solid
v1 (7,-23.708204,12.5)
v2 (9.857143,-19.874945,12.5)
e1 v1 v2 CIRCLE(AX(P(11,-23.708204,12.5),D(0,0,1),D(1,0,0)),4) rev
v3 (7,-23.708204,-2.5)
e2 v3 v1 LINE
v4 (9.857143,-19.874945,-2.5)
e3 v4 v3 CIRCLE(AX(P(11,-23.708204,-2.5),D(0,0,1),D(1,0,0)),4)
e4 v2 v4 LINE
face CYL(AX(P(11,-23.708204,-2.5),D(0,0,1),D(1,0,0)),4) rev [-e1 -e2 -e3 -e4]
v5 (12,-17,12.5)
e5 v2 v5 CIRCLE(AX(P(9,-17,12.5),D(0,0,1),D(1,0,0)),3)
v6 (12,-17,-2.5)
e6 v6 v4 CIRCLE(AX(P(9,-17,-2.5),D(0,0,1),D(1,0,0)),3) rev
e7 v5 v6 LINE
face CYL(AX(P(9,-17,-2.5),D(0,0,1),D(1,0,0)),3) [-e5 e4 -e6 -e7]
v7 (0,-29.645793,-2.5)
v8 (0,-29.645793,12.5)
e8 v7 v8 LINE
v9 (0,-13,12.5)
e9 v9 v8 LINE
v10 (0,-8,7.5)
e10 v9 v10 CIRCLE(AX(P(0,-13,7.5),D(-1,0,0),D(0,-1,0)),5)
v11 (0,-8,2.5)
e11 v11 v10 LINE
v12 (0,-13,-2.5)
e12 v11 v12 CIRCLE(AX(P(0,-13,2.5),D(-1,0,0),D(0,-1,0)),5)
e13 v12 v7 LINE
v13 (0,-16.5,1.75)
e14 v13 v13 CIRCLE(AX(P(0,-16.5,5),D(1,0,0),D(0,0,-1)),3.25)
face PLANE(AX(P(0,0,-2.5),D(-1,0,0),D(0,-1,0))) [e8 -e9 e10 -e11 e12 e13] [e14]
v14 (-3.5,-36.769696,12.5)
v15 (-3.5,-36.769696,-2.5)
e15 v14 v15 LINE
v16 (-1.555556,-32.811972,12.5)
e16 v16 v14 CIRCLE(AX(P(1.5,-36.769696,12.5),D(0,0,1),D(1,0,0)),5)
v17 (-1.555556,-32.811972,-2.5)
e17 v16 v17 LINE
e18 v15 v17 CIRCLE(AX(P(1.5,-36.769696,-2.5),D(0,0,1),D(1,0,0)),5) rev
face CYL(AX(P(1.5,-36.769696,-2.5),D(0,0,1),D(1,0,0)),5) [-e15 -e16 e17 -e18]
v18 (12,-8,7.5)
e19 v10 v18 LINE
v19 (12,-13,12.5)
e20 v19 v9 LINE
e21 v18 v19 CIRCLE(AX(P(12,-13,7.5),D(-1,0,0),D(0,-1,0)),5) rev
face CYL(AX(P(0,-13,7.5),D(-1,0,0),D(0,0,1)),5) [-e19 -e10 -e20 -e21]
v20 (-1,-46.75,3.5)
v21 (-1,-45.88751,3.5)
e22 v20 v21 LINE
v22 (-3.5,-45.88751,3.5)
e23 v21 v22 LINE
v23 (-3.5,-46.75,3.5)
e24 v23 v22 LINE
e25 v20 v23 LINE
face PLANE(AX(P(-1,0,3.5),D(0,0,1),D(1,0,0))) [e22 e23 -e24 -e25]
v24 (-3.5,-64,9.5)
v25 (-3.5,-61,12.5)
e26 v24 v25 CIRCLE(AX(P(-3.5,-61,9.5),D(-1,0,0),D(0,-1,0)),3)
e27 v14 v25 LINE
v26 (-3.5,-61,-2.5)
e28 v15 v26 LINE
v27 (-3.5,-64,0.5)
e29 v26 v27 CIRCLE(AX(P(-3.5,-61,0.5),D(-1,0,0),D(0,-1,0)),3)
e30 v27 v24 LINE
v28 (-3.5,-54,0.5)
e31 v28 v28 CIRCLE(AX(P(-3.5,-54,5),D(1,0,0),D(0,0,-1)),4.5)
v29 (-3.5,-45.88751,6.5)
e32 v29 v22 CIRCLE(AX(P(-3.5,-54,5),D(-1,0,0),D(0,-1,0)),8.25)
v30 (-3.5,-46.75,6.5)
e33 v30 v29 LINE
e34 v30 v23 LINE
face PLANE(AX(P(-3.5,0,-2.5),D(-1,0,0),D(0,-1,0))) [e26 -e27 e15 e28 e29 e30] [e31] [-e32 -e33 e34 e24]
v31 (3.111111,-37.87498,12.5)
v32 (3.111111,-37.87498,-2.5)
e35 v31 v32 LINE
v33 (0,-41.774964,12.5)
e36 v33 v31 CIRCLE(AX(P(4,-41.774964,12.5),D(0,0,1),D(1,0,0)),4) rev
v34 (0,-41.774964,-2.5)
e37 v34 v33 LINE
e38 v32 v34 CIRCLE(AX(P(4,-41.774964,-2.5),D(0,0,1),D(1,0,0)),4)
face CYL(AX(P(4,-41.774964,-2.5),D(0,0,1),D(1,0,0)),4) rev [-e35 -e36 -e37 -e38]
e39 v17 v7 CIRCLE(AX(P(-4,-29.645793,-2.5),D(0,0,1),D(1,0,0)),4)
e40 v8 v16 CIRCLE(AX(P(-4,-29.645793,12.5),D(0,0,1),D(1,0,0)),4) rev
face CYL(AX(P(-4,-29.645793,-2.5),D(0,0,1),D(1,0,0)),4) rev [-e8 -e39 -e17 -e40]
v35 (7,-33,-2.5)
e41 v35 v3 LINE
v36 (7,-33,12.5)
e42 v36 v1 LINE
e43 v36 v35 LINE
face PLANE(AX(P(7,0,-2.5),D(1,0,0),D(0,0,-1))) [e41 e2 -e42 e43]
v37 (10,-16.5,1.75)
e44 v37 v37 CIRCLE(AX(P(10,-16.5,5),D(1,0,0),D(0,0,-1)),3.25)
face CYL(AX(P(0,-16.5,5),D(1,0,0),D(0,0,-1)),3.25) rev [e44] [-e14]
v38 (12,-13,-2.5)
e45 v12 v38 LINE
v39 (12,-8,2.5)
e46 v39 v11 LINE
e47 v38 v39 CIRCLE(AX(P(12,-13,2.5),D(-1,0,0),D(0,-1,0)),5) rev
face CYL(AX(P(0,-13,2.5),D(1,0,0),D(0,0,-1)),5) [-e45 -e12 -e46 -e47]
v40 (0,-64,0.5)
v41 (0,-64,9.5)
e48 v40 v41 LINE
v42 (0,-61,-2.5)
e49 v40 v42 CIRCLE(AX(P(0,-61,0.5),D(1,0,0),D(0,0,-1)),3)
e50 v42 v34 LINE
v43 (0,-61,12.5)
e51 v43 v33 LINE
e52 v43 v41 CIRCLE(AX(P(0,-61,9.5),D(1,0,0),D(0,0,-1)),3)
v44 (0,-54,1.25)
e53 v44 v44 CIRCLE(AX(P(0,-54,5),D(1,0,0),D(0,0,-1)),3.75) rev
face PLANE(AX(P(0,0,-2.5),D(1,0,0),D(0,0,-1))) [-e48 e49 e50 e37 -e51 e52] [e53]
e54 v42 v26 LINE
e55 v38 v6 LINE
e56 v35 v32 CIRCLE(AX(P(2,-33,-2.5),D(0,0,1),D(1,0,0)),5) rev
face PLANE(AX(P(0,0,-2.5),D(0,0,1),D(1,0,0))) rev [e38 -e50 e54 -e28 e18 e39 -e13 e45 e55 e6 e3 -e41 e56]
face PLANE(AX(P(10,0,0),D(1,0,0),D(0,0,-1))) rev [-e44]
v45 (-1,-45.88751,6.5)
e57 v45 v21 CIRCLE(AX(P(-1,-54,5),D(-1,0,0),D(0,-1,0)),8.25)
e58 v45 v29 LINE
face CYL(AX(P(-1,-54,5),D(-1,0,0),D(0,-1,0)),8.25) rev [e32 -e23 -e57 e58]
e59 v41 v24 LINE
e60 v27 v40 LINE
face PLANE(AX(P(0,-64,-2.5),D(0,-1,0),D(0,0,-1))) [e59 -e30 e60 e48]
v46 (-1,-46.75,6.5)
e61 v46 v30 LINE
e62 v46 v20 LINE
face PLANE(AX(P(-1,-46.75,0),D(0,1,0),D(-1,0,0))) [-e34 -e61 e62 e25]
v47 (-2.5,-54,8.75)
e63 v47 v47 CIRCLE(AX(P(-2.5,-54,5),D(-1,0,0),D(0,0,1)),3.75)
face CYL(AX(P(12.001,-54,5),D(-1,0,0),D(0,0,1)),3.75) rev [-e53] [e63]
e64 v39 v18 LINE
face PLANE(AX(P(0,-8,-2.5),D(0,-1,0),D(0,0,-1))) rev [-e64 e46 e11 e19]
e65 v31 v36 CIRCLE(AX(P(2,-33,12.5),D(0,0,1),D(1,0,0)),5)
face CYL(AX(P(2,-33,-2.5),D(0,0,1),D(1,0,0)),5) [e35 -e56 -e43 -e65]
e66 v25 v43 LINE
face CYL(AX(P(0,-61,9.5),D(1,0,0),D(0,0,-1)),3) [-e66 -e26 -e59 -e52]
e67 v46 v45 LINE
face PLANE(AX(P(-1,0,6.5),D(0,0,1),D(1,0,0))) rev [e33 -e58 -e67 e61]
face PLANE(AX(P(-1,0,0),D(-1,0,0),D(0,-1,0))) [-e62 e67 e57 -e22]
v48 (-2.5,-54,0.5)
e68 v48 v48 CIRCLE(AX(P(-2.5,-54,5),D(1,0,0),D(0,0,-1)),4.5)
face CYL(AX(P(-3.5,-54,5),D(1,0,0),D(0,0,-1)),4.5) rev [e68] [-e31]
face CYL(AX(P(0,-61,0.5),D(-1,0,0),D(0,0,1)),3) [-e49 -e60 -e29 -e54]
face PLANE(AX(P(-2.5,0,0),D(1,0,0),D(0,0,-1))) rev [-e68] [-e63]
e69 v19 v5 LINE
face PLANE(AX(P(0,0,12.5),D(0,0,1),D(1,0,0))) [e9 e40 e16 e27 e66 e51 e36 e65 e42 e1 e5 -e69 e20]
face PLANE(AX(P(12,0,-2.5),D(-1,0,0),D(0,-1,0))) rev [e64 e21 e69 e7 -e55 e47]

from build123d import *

# Parameters (mm, degrees)
BOSS_EXTRUDE1_DEPTH      = 12.5
BOSS_EXTRUDE1_DEPTH_BACK = 2.5
F_3DSKETCH2_R            = 4.5
CUT_EXTRUDE2_DEPTH       = 1
CUT_EXTRUDE3_REACH       = 68.802
SKETCH3_R                = 3.75
CUT_EXTRUDE6_OUTLINE_R   = 3.25
CUT_EXTRUDE6_DEPTH       = 10
CUT_EXTRUDE7_DEPTH       = 2.5
FILLET1_R                = 5
FILLET2_R                = 4
FILLET3_R                = 4
FILLET4_R                = 3
FILLET5_R                = 3
FILLET6_R                = 4


# Read off the part's stored shape, not the designer's step: Cut-Extrude6
with BuildPart() as part:
    # Sketch1 → Boss-Extrude1 (new, two sides: drawn at the far end of the back side and taken through both)
    with BuildSketch(Plane.XY.offset(-BOSS_EXTRUDE1_DEPTH_BACK)):
        Polygon((0, -8), (0, -32), (-3.5, -32), (-3.5, -64), (0, -64), (0, -38), (7, -38), (7, -20), (12, -20), (12, -8), align=None)
    extrude(amount=BOSS_EXTRUDE1_DEPTH + BOSS_EXTRUDE1_DEPTH_BACK)

    # 3DSketch2 → Cut-Extrude2 (cut)
    with BuildSketch(Plane(origin=(-3.5, -54, 5), x_dir=(0, -1, 0), z_dir=(-1, 0, 0))):
        with Locations(Location((0, 0, 0), (0, 0, 270))):
            Circle(F_3DSKETCH2_R)
    extrude(amount=-CUT_EXTRUDE2_DEPTH, mode=Mode.SUBTRACT)

    # Sketch3 → Cut-Extrude3 (cut, up to next)
    with BuildSketch(Plane.ZY.offset(2.5), mode=Mode.PRIVATE) as cut_extrude3_sk1:
        with Locations((5, -54)):
            Circle(SKETCH3_R)
    cut_extrude3_tool1 = extrude(cut_extrude3_sk1.sketch, amount=-CUT_EXTRUDE3_REACH, mode=Mode.PRIVATE) & part.part
    add(cut_extrude3_tool1.solids().sort_by_distance((-2.5, -54, 5))[0], mode=Mode.SUBTRACT)

    # Cut-Extrude6 outline → Cut-Extrude6 (cut)
    with BuildSketch(Plane.YZ):
        with Locations((-16.5, 5)):
            Circle(CUT_EXTRUDE6_OUTLINE_R)
    extrude(amount=CUT_EXTRUDE6_DEPTH, mode=Mode.SUBTRACT)

    # Sketch4 → Cut-Extrude7 (cut)
    with BuildSketch(Plane.ZY.offset(3.5)):
        with BuildLine():
            Line((5, -46.75), (5, -45.75))
            ThreePointArc((5, -45.75), (4.24685511, -45.784449332), (3.5, -45.88750963))
            Line((3.5, -45.88750963), (3.5, -46.75))
            Line((3.5, -46.75), (5, -46.75))
        make_face()
        with BuildLine():
            ThreePointArc((6.5, -45.88750963), (5.75314489, -45.784449332), (5, -45.75))
            Line((5, -45.75), (5, -46.75))
            Line((5, -46.75), (6.5, -46.75))
            Line((6.5, -46.75), (6.5, -45.88750963))
        make_face()
    extrude(amount=-CUT_EXTRUDE7_DEPTH, mode=Mode.SUBTRACT)

    # Fillet1
    # the kernel refuses this fillet: 5 mm, written as the material it takes off along each edge
    with BuildSketch(Plane(origin=(7, -38, -15), x_dir=(-1, 0, 0), z_dir=(0, 0, 1))) as fillet1_piece_1:
        with BuildLine():
            CenterArc((FILLET1_R, -FILLET1_R), FILLET1_R, 90, 90)
            Line((0, -FILLET1_R), (-FILLET1_R * 0.02, -FILLET1_R))
            Line((-FILLET1_R * 0.02, -FILLET1_R), (-FILLET1_R * 0.02, FILLET1_R * 0.02))
            Line((-FILLET1_R * 0.02, FILLET1_R * 0.02), (FILLET1_R, FILLET1_R * 0.02))
            Line((FILLET1_R, FILLET1_R * 0.02), (FILLET1_R, 0))
        make_face()
    extrude(amount=40, mode=Mode.SUBTRACT)
    with BuildSketch(Plane(origin=(24.5, -8, 12.5), x_dir=(0, 0, -1), z_dir=(-1, 0, 0))) as fillet1_piece_2:
        with BuildLine():
            CenterArc((FILLET1_R, FILLET1_R), FILLET1_R, 180, 90)
            Line((0, FILLET1_R), (-FILLET1_R * 0.02, FILLET1_R))
            Line((-FILLET1_R * 0.02, FILLET1_R), (-FILLET1_R * 0.02, -FILLET1_R * 0.02))
            Line((-FILLET1_R * 0.02, -FILLET1_R * 0.02), (FILLET1_R, -FILLET1_R * 0.02))
            Line((FILLET1_R, -FILLET1_R * 0.02), (FILLET1_R, 0))
        make_face()
    extrude(amount=37, mode=Mode.SUBTRACT)
    with BuildSketch(Plane(origin=(24.5, -8, -2.5), x_dir=(0, 0, 1), z_dir=(-1, 0, 0))) as fillet1_piece_3:
        with BuildLine():
            CenterArc((FILLET1_R, -FILLET1_R), FILLET1_R, 90, 90)
            Line((0, -FILLET1_R), (-FILLET1_R * 0.02, -FILLET1_R))
            Line((-FILLET1_R * 0.02, -FILLET1_R), (-FILLET1_R * 0.02, FILLET1_R * 0.02))
            Line((-FILLET1_R * 0.02, FILLET1_R * 0.02), (FILLET1_R, FILLET1_R * 0.02))
            Line((FILLET1_R, FILLET1_R * 0.02), (FILLET1_R, 0))
        make_face()
    extrude(amount=37, mode=Mode.SUBTRACT)
    with BuildSketch(Plane(origin=(-3.5, -32, -14.424240018), x_dir=(1, 0, 0), z_dir=(0, 0, 1))) as fillet1_piece_4:
        with BuildLine():
            CenterArc((5, -4.769696007), FILLET1_R, 107.457603124, 72.542396876)
            Line((0, -4.769696007), (-0.1, -4.769696007))
            Line((-0.1, -4.769696007), (-0.1, 0))
            Line((-0.1, 0), (0, 0.1))
            ThreePointArc((0, 0.1), (1.75, 0.1), (3.47, 0.09539392))
            Line((3.47, 0.09539392), (3.5, 0))
        make_face()
    extrude(amount=38.848480035, mode=Mode.SUBTRACT)

    # Fillet2
    fillet2_edges = [part.edges().sort_by_distance(p)[0] for p in [
        (0, -32, 5),
    ]]
    fillet(fillet2_edges, radius=FILLET2_R)

    # Fillet3
    fillet3_edges = [part.edges().sort_by_distance(p)[0] for p in [
        (0, -38, 5),
    ]]
    fillet(fillet3_edges, radius=FILLET3_R)

    # Fillet4
    fillet4_edges = [part.edges().sort_by_distance(p)[0] for p in [
        (-1.75, -64, 12.5),
        (-1.75, -64, -2.5),
    ]]
    fillet(fillet4_edges, radius=FILLET4_R)

    # Fillet5
    fillet5_edges = [part.edges().sort_by_distance(p)[0] for p in [
        (12, -20, 5),
    ]]
    fillet(fillet5_edges, radius=FILLET5_R)

    # Fillet6
    fillet6_edges = [part.edges().sort_by_distance(p)[0] for p in [
        (7, -20, 5),
    ]]
    fillet(fillet6_edges, radius=FILLET6_R)


solid = part.part
